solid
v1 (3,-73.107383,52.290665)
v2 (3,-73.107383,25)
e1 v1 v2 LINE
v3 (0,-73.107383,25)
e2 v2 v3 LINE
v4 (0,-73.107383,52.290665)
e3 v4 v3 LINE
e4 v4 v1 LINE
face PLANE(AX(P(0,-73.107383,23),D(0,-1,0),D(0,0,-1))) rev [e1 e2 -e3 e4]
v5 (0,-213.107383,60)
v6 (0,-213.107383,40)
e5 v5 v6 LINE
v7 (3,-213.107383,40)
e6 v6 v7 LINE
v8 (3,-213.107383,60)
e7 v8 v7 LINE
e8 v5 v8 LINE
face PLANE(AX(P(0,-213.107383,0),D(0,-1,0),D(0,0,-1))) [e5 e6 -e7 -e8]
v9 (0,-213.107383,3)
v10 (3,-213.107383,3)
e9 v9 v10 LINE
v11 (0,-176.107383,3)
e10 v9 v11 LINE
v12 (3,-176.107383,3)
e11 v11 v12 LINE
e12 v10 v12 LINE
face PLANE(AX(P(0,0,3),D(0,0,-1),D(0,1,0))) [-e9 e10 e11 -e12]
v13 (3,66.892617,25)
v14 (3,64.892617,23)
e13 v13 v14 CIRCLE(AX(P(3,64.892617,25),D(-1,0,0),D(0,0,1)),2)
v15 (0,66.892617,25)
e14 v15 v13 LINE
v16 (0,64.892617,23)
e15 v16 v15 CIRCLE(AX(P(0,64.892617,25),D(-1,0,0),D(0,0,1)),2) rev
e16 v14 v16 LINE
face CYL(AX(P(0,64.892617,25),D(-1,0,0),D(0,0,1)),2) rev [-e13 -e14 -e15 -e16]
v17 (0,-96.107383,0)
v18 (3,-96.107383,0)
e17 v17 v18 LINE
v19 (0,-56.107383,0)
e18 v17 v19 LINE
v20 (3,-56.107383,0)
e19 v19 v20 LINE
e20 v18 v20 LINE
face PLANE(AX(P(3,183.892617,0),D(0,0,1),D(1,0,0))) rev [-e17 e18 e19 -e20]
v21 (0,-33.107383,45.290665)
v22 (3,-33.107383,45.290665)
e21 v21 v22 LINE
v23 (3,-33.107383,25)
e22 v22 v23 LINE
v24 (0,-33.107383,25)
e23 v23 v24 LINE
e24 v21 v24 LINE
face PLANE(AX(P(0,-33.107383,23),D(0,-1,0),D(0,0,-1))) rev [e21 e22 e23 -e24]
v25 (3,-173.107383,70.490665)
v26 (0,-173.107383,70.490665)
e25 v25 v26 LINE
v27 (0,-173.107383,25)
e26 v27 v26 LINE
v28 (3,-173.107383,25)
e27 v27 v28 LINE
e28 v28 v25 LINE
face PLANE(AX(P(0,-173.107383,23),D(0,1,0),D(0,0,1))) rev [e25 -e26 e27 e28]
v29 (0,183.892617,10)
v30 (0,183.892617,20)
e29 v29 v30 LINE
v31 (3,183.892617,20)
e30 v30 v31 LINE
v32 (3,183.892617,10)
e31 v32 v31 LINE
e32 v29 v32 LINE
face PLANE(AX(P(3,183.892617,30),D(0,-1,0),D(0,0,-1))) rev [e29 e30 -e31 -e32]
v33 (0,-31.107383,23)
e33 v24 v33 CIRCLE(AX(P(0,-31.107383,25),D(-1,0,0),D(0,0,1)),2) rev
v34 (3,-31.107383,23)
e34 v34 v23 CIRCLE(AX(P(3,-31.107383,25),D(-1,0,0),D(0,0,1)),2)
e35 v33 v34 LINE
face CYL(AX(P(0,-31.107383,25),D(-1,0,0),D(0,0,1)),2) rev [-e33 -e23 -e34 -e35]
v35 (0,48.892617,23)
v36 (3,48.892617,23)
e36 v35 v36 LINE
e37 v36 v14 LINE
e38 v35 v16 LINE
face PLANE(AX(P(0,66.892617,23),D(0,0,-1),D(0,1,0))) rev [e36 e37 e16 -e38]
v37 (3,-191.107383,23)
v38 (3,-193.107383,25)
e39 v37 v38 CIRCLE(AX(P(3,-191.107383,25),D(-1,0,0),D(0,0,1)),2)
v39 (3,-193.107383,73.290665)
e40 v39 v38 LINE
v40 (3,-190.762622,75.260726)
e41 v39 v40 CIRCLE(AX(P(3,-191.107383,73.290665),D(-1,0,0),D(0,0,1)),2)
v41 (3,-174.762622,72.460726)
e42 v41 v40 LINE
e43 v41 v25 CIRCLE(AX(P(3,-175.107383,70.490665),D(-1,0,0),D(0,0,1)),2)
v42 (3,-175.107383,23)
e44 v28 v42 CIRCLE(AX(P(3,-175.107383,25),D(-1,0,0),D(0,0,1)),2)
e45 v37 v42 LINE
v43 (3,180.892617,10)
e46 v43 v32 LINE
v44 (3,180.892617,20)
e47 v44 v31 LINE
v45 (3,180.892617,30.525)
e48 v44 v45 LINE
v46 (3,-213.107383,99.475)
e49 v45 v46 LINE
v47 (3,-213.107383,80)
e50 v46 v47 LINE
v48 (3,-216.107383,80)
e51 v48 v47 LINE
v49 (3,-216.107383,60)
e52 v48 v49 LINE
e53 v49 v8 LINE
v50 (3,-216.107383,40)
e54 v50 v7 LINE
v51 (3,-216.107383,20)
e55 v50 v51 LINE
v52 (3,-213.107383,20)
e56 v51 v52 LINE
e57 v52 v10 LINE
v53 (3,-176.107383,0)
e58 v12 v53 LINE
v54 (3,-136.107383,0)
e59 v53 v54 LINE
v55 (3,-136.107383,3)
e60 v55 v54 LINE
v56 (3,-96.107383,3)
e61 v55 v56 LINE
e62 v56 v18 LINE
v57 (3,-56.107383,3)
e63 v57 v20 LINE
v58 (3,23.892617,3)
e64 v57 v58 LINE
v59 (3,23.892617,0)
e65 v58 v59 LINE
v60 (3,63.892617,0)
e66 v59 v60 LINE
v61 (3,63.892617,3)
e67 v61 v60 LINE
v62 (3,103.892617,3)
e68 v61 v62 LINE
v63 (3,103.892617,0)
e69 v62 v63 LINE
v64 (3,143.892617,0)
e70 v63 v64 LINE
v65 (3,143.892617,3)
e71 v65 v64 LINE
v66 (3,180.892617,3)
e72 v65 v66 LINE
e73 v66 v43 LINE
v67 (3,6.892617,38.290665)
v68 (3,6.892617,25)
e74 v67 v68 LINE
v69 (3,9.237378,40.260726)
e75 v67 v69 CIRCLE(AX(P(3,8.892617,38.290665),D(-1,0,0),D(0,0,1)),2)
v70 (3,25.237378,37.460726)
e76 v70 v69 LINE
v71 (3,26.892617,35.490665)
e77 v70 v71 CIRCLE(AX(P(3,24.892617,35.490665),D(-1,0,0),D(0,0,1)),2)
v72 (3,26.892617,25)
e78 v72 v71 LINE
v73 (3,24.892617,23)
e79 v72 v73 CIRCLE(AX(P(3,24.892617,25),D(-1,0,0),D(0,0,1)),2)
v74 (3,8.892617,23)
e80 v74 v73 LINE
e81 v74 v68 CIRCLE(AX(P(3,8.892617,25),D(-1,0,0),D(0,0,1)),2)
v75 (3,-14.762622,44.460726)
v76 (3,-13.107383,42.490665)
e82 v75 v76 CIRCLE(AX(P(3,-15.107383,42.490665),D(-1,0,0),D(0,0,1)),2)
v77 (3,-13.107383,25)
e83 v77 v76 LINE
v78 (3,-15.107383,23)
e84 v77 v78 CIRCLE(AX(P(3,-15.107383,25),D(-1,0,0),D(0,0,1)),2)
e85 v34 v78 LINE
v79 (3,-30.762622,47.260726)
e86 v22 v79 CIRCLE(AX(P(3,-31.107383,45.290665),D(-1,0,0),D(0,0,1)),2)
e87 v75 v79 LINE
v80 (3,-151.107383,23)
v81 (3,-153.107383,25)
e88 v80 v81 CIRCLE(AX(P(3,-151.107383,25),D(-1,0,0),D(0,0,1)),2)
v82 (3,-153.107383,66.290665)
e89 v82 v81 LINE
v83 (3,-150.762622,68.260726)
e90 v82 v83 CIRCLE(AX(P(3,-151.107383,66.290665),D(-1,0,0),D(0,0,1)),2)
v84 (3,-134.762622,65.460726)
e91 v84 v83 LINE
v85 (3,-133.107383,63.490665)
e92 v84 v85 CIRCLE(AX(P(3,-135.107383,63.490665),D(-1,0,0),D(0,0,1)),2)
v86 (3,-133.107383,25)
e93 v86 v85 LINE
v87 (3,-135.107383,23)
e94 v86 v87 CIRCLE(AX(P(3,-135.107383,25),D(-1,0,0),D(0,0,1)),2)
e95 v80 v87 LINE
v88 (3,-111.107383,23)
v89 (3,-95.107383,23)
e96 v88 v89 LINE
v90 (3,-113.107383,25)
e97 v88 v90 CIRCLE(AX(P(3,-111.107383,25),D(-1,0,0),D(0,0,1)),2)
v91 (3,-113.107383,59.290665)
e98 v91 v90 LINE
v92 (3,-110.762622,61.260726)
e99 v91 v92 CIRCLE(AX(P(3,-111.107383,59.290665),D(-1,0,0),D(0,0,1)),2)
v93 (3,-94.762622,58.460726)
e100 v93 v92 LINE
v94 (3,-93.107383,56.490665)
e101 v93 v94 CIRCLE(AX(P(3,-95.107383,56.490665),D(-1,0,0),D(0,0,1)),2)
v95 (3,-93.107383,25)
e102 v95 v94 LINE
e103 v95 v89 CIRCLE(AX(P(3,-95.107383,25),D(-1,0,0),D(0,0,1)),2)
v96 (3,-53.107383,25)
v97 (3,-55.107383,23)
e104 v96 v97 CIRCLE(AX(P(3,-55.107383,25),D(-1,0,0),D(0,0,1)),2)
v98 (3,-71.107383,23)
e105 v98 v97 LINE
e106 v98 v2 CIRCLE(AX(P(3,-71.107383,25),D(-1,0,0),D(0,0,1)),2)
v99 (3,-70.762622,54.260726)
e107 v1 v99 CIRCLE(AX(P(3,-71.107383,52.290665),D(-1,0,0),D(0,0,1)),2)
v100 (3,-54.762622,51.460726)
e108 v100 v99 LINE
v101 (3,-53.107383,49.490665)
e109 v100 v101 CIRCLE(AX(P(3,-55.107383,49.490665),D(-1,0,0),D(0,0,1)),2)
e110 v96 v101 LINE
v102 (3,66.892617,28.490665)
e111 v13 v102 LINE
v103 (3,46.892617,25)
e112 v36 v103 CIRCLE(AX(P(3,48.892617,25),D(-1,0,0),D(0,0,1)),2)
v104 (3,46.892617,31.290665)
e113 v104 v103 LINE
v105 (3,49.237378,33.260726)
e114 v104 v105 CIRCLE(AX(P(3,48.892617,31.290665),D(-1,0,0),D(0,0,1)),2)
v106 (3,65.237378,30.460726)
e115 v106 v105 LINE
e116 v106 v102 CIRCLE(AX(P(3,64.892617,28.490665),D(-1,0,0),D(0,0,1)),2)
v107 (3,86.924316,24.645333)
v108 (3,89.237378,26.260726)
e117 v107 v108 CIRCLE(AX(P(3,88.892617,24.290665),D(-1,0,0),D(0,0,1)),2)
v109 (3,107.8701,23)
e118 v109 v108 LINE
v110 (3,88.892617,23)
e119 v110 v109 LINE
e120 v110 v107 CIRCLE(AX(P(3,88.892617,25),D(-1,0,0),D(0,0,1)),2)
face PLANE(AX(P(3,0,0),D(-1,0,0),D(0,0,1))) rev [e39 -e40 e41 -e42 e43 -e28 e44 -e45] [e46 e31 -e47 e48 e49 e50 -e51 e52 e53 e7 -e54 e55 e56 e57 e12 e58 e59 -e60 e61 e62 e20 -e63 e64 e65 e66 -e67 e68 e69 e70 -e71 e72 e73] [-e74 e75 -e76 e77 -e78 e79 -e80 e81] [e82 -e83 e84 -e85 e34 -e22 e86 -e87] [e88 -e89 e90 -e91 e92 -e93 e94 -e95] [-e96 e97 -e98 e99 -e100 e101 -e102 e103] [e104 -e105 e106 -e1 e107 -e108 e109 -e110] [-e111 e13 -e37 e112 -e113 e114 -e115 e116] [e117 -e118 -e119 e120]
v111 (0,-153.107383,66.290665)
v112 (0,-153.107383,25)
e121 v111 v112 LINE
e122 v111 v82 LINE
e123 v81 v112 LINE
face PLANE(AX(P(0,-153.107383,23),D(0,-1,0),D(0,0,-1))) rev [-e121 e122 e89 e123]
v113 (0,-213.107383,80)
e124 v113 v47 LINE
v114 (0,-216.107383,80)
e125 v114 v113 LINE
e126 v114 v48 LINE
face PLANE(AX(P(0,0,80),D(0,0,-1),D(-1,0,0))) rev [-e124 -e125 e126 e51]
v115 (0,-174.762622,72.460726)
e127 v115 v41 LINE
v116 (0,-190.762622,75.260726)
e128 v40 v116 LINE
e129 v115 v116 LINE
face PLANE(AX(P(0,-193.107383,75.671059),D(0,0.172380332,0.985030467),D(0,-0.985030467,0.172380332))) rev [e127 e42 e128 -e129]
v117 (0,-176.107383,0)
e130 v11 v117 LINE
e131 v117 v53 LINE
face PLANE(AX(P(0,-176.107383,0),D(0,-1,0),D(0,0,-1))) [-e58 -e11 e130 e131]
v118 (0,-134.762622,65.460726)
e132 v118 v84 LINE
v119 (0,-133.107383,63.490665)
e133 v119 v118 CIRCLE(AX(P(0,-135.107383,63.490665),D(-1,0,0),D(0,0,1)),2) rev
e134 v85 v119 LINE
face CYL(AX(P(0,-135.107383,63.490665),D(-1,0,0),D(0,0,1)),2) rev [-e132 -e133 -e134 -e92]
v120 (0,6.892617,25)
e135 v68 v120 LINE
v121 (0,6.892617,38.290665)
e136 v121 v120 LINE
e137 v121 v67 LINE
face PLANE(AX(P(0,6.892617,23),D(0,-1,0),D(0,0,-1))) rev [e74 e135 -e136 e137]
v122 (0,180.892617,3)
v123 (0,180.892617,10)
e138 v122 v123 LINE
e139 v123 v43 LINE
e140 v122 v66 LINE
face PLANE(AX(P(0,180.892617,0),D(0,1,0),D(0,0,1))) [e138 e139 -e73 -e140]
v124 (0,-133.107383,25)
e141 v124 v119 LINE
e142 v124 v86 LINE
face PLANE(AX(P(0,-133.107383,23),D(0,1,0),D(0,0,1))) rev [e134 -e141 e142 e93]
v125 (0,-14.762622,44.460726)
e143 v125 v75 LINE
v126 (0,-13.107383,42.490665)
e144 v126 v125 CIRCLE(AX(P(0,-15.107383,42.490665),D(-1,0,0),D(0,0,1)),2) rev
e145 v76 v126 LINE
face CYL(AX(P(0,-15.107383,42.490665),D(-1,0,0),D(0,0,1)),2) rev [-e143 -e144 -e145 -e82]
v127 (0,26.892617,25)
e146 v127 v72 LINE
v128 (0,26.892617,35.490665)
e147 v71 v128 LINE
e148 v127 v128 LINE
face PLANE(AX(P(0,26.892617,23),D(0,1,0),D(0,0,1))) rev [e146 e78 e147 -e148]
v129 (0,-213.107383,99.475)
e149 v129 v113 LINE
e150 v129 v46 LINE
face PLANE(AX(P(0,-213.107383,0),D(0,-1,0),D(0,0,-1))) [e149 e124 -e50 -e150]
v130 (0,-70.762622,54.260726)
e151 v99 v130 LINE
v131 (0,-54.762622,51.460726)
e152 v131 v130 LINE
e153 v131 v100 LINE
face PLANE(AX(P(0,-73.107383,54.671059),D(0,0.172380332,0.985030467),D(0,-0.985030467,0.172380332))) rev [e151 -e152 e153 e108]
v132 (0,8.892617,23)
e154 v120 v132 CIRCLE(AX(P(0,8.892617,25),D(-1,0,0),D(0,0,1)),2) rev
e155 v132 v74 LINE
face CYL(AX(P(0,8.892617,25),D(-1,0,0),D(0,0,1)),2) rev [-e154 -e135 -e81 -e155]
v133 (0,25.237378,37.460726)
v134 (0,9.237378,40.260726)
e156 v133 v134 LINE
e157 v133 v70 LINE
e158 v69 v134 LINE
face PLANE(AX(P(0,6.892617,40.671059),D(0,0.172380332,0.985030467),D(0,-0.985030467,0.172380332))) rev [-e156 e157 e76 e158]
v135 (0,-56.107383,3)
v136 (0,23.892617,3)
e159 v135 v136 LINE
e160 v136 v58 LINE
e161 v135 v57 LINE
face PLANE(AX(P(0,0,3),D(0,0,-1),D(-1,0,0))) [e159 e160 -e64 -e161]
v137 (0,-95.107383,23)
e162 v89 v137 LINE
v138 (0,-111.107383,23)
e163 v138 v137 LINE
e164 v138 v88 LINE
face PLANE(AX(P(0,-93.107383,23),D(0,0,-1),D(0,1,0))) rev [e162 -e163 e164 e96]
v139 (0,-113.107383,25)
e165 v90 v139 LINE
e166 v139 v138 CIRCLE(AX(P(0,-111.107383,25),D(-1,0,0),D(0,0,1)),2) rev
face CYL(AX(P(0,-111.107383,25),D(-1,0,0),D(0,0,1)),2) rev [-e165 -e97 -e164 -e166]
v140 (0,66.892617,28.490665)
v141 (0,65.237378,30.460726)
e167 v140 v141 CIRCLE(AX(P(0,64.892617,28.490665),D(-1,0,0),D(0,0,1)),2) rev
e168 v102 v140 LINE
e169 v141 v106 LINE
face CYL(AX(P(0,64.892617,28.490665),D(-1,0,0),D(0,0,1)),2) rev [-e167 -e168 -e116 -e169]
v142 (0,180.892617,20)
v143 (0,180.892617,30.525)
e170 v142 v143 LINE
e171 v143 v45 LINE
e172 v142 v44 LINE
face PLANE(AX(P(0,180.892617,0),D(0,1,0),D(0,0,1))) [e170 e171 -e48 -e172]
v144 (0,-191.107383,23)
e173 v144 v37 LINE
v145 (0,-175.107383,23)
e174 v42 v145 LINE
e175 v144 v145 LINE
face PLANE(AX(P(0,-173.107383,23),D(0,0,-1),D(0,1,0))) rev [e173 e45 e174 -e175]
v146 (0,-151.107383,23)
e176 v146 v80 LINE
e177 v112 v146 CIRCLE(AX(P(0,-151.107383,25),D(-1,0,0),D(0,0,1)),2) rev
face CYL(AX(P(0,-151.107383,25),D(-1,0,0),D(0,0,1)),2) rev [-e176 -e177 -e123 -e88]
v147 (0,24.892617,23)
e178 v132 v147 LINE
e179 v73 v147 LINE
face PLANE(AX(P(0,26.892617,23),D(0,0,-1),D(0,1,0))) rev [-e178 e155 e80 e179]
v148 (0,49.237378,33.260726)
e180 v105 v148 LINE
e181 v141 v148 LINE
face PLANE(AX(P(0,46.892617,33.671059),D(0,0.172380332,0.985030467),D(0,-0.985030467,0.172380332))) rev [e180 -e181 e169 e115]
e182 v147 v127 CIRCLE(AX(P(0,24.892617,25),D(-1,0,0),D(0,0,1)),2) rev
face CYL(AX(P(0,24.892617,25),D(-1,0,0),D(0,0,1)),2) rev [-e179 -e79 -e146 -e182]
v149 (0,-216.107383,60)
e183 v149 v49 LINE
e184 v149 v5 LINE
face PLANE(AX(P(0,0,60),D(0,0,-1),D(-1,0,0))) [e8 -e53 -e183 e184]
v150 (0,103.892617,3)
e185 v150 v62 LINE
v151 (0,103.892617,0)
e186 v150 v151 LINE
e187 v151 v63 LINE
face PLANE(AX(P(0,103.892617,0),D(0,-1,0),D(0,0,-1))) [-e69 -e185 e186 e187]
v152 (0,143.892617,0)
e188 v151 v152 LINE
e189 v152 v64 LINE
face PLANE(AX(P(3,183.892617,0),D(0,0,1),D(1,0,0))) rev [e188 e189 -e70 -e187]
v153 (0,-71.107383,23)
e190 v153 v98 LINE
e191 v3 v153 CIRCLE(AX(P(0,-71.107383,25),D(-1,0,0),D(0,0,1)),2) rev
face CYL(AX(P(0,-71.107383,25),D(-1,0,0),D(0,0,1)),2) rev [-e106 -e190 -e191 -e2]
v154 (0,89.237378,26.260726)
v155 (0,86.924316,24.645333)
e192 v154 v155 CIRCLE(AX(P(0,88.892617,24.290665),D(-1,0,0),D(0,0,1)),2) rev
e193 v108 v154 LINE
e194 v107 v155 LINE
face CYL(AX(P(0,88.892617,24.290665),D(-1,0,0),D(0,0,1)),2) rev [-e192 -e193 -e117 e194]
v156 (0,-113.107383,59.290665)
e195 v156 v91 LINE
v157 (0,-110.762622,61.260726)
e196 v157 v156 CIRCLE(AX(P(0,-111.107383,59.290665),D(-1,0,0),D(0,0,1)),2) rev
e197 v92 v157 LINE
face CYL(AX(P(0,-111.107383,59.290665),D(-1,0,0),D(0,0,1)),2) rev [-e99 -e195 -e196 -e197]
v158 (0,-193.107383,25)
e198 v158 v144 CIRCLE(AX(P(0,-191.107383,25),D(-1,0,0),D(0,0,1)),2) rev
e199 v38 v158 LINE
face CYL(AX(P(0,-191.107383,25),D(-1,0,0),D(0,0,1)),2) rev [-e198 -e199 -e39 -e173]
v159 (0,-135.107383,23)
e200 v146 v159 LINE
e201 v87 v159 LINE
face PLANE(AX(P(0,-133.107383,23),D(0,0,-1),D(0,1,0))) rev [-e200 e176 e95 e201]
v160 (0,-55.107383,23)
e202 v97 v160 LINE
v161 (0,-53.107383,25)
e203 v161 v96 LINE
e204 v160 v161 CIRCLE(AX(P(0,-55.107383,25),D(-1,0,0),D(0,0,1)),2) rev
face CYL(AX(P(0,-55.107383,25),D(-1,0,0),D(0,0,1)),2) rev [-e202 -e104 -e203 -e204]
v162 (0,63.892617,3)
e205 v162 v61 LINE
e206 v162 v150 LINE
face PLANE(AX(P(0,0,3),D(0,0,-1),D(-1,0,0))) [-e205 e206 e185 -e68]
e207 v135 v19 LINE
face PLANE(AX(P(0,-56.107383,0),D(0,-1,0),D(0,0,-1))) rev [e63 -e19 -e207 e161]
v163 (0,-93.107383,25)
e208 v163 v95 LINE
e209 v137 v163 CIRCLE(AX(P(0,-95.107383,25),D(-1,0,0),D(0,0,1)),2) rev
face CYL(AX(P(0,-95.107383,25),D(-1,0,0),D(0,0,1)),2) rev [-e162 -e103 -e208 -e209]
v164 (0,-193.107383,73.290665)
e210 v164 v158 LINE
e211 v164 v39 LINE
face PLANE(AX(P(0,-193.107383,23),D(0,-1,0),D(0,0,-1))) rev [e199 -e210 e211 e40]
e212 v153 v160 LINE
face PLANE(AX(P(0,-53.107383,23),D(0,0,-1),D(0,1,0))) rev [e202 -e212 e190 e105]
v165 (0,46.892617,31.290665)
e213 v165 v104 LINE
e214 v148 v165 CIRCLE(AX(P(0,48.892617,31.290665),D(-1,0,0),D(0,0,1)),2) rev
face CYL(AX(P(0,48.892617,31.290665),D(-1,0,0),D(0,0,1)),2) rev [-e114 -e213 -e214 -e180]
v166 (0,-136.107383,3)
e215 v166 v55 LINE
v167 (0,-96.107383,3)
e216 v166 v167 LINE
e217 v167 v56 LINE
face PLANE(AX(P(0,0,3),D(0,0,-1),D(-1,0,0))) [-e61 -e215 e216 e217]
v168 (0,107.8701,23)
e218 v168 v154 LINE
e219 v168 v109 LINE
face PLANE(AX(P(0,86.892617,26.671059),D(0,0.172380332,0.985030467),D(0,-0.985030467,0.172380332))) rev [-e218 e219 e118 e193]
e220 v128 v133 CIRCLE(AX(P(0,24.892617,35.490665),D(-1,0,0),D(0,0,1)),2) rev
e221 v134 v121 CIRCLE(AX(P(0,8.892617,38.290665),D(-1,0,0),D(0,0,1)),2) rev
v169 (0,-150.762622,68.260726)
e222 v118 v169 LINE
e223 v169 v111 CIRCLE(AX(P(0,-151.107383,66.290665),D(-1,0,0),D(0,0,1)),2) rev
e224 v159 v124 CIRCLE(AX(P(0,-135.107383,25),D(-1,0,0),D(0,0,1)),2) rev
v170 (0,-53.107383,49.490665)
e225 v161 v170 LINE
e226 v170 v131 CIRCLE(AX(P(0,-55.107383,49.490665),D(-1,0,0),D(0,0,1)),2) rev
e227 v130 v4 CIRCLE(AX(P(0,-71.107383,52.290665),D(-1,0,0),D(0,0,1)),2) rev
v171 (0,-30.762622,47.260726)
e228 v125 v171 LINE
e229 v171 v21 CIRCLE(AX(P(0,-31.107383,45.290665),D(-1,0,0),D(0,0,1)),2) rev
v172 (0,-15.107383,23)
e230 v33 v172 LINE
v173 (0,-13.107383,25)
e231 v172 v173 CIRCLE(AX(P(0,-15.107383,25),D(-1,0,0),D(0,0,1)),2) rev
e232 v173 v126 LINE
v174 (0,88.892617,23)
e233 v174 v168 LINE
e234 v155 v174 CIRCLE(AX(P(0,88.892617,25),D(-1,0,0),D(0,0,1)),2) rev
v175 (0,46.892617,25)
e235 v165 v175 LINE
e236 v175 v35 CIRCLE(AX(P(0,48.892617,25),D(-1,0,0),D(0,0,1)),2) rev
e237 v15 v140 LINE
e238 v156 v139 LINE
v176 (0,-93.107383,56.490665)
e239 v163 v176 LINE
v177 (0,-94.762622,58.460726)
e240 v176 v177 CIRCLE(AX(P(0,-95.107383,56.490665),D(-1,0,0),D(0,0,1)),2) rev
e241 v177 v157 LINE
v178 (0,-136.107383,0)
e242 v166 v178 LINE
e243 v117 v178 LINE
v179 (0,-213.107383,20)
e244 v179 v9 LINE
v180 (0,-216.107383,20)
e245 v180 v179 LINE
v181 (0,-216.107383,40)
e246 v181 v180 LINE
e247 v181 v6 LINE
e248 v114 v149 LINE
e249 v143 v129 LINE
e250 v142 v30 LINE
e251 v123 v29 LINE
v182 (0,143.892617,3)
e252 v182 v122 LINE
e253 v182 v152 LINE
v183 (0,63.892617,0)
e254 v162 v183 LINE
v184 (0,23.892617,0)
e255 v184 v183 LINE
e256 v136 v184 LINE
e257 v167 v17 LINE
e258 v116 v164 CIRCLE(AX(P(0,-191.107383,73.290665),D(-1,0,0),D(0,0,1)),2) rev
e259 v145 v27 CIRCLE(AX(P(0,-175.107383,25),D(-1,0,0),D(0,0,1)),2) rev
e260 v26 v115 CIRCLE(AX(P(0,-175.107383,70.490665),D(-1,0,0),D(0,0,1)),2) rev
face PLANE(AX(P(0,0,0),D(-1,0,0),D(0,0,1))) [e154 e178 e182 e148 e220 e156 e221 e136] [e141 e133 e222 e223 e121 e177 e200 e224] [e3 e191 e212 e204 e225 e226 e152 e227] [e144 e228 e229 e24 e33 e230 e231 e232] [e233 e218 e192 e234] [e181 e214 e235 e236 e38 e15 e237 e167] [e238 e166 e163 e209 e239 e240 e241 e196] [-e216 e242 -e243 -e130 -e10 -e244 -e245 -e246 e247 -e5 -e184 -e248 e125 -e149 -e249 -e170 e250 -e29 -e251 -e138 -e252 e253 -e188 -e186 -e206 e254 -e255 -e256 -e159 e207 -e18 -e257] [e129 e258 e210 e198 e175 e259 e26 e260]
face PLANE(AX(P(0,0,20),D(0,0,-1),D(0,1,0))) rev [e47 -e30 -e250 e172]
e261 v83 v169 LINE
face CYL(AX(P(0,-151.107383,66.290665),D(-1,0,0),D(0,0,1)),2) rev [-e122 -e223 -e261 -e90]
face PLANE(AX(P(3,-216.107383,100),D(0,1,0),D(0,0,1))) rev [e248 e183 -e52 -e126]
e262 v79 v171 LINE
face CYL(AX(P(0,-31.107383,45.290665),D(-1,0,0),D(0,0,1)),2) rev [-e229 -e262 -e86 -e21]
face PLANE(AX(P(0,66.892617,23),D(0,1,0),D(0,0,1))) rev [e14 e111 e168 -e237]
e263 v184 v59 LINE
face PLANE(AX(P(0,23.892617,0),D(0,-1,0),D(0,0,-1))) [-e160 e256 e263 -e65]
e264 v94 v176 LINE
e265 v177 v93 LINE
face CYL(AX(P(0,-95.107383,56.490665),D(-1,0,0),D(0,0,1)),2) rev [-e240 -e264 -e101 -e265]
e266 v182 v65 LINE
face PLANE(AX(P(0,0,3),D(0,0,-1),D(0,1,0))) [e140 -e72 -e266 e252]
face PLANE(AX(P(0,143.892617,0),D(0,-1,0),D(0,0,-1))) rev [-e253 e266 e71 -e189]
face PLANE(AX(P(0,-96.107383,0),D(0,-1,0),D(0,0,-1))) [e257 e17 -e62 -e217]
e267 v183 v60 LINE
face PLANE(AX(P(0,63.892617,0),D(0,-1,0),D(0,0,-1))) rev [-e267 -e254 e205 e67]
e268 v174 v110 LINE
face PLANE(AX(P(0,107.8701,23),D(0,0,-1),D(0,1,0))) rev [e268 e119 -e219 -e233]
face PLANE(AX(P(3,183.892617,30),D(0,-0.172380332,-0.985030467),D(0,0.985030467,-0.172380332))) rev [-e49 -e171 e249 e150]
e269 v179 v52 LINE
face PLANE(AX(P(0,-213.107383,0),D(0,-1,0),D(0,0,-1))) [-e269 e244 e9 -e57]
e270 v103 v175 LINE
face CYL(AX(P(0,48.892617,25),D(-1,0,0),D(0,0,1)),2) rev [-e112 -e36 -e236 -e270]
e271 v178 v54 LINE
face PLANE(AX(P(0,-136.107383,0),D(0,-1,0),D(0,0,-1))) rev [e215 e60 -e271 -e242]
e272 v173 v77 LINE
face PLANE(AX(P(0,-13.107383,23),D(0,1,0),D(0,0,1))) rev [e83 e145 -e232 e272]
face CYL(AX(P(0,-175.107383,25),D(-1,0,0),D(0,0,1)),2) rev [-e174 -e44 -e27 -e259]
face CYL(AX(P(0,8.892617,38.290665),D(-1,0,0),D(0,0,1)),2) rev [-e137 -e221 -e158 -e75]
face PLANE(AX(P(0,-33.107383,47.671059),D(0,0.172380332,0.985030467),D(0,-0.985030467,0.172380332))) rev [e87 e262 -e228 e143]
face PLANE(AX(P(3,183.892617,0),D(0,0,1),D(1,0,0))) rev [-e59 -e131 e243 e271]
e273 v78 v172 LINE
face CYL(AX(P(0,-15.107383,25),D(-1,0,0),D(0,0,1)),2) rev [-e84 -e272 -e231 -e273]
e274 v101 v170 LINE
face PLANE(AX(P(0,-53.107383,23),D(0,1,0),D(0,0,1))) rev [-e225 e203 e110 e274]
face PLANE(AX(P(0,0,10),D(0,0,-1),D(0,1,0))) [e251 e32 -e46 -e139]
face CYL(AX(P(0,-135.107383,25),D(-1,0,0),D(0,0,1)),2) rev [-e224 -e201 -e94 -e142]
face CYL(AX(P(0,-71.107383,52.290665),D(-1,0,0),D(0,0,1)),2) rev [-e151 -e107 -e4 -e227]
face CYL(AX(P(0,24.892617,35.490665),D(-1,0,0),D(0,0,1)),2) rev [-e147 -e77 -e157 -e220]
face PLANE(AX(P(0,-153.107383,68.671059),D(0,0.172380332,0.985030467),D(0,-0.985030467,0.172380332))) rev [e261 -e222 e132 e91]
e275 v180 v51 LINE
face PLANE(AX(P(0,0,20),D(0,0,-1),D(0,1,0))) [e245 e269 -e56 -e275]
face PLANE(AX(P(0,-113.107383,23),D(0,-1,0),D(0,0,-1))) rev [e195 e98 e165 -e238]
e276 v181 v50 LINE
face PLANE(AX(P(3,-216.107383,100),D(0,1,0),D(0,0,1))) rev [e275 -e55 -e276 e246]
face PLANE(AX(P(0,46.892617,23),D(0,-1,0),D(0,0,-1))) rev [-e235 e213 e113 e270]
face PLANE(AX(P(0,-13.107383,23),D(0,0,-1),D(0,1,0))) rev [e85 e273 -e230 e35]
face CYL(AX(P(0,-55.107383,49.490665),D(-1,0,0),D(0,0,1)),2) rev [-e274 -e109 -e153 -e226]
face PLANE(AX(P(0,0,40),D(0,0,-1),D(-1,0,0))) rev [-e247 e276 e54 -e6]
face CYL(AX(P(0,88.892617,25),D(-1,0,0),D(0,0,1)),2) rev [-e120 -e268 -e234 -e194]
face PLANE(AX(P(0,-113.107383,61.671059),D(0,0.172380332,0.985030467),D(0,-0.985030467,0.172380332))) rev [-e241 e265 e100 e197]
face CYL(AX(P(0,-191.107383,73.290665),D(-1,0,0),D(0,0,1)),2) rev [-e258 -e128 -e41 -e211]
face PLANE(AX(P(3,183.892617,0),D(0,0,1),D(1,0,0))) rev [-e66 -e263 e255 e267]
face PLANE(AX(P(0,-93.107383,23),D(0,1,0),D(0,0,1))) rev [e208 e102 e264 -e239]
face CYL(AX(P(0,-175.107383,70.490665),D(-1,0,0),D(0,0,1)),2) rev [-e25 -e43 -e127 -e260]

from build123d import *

# Parameters (mm, degrees)
BOSS_EXTRUDE1_DEPTH = 3
SKETCH2_W           = 20
SKETCH2_H           = 3
SKETCH2_W_2         = 3
SKETCH2_H_2         = 40
SKETCH2_H_3         = 80
CUT_EXTRUDE1_DEPTH  = 3
CUT_EXTRUDE2_DEPTH  = 3
FILLET1_R           = 2


with BuildPart() as part:
    # Sketch1 → Boss-Extrude1 (new body)
    with BuildSketch(Plane(origin=(0, 0, 0), x_dir=(0, 0, -1), z_dir=(1, 0, 0))):
        Polygon((0, 183.89261745), (0, -216.10738255), (-100, -216.10738255), (-30, 183.89261745), align=None)
    extrude(amount=BOSS_EXTRUDE1_DEPTH)

    # Sketch2 → Cut-Extrude1 (cut)
    with BuildSketch(Plane(origin=(3, 0, 0), x_dir=(0, 0, -1), z_dir=(1, 0, 0))):
        Polygon((-80, -213.10738255), (-99.475, -213.10738255), (-100, -216.10738255), (-80, -216.10738255), align=None)
        Polygon((-30, 183.89261745), (-30.525, 180.89261745), (-20, 180.89261745), (-20, 183.89261745), align=None)
        with Locations((-50, -214.60738255)):
            Rectangle(SKETCH2_W, SKETCH2_H)
        Polygon((-3, -213.10738255), (-20, -213.10738255), (-20, -216.10738255), (0, -216.10738255), (0, -176.10738255), (-3, -176.10738255), align=None)
        Polygon((-10, 183.89261745), (-10, 180.89261745), (-3, 180.89261745), (-3, 143.89261745), (0, 143.89261745), (0, 183.89261745), align=None)
        with Locations((-1.5, -116.10738255)):
            Rectangle(SKETCH2_W_2, SKETCH2_H_2)
        with Locations((-1.5, 83.89261745)):
            Rectangle(SKETCH2_W_2, SKETCH2_H_2)
        with Locations((-1.5, -16.10738255)):
            Rectangle(SKETCH2_W_2, SKETCH2_H_3)
    extrude(amount=-CUT_EXTRUDE1_DEPTH, mode=Mode.SUBTRACT)

    # Sketch3 → Cut-Extrude2 (cut)
    with BuildSketch(Plane(origin=(3, 0, 0), x_dir=(0, 0, -1), z_dir=(1, 0, 0))):
        Polygon((-68.671059496, -153.10738255), (-65.171059496, -133.10738255), (-23, -133.10738255), (-23, -153.10738255), align=None)
        Polygon((-23, -173.10738255), (-23, -193.10738255), (-75.671059496, -193.10738255), (-72.171059496, -173.10738255), align=None)
        Polygon((-61.671059496, -113.10738255), (-58.171059496, -93.10738255), (-23, -93.10738255), (-23, -113.10738255), align=None)
        Polygon((-54.671059496, -73.10738255), (-51.171059496, -53.10738255), (-23, -53.10738255), (-23, -73.10738255), align=None)
        Polygon((-23, 107.870100283), (-23, 86.89261745), (-26.671059496, 86.89261745), align=None)
        Polygon((-23, -33.10738255), (-47.671059496, -33.10738255), (-44.171059496, -13.10738255), (-23, -13.10738255), align=None)
        Polygon((-23, 6.89261745), (-40.671059496, 6.89261745), (-37.171059496, 26.89261745), (-23, 26.89261745), align=None)
        Polygon((-23, 46.89261745), (-33.671059496, 46.89261745), (-30.171059496, 66.89261745), (-23, 66.89261745), align=None)
    extrude(amount=-CUT_EXTRUDE2_DEPTH, mode=Mode.SUBTRACT)

    # Fillet1
    # the kernel refuses this fillet: 2 mm, written as the material it adds along each edge
    with BuildSketch(Plane(origin=(3, 86.89261745, 26.671059496), x_dir=(0, 0, -1), z_dir=(-1, 0, 0)), Plane(origin=(3, 46.89261745, 33.671059496), x_dir=(0, 0, -1), z_dir=(-1, 0, 0)), Plane(origin=(3, 6.89261745, 40.671059496), x_dir=(0, 0, -1), z_dir=(-1, 0, 0)), Plane(origin=(3, -33.10738255, 47.671059496), x_dir=(0, 0, -1), z_dir=(-1, 0, 0)), Plane(origin=(3, -193.10738255, 75.671059496), x_dir=(0, 0, -1), z_dir=(-1, 0, 0))) as fillet1_piece_1:
        with BuildLine():
            CenterArc((FILLET1_R * 1.19019702521, -FILLET1_R), FILLET1_R, 90, 99.926245507)
            Line((FILLET1_R * 0.205166558057, -FILLET1_R * 1.17238033175), (0, 0))
            Line((0, 0), (FILLET1_R * 1.19019702521, 0))
        make_face()
    extrude(amount=3)
    with BuildSketch(Plane(origin=(3, 86.89261745, 23), x_dir=(0, 1, 0), z_dir=(-1, 0, 0)), Plane(origin=(3, 66.89261745, 23), x_dir=(0, 0, 1), z_dir=(-1, 0, 0)), Plane(origin=(3, 26.89261745, 23), x_dir=(0, 0, 1), z_dir=(-1, 0, 0)), Plane(origin=(3, -13.10738255, 23), x_dir=(0, 0, 1), z_dir=(-1, 0, 0)), Plane(origin=(3, -93.10738255, 23), x_dir=(0, 0, 1), z_dir=(-1, 0, 0)), Plane(origin=(3, -73.10738255, 23), x_dir=(0, 1, 0), z_dir=(-1, 0, 0)), Plane(origin=(3, -53.10738255, 23), x_dir=(0, 0, 1), z_dir=(-1, 0, 0)), Plane(origin=(3, -133.10738255, 23), x_dir=(0, 0, 1), z_dir=(-1, 0, 0)), Plane(origin=(3, -113.10738255, 23), x_dir=(0, 1, 0), z_dir=(-1, 0, 0)), Plane(origin=(3, -153.10738255, 23), x_dir=(0, 1, 0), z_dir=(-1, 0, 0)), Plane(origin=(3, -193.10738255, 23), x_dir=(0, 1, 0), z_dir=(-1, 0, 0))) as fillet1_piece_2:
        with BuildLine():
            CenterArc((FILLET1_R, -FILLET1_R), FILLET1_R, 90, 90)
            Line((0, -FILLET1_R), (0, 0))
            Line((0, 0), (FILLET1_R, 0))
        make_face()
    extrude(amount=3)
    with BuildSketch(Plane(origin=(3, 66.89261745, 30.171059496), x_dir=(0, -0.985030467155704, 0.17238033175224968), z_dir=(-1, 0, 0)), Plane(origin=(3, 26.89261745, 37.171059496), x_dir=(0, -0.9850304671557044, 0.172380331752247), z_dir=(-1, 0, 0)), Plane(origin=(3, -13.10738255, 44.171059496), x_dir=(0, -0.9850304671557039, 0.1723803317522504), z_dir=(-1, 0, 0)), Plane(origin=(3, -53.10738255, 51.171059496), x_dir=(0, -0.9850304671557039, 0.1723803317522504), z_dir=(-1, 0, 0)), Plane(origin=(3, -93.10738255, 58.171059496), x_dir=(0, -0.9850304671557047, 0.17238033175224557), z_dir=(-1, 0, 0)), Plane(origin=(3, -133.10738255, 65.171059496), x_dir=(0, -0.9850304671557039, 0.17238033175224987), z_dir=(-1, 0, 0)), Plane(origin=(3, -173.10738255, 72.171059496), x_dir=(0, -0.9850304671557039, 0.17238033175224987), z_dir=(-1, 0, 0))) as fillet1_piece_3:
        with BuildLine():
            CenterArc((FILLET1_R * 0.840197025212, -FILLET1_R), FILLET1_R, 90, 80.073754493)
            Line((-FILLET1_R * 0.144833441943, -FILLET1_R * 0.827619668248), (0, 0))
            Line((0, 0), (FILLET1_R * 0.840197025212, 0))
        make_face()
    extrude(amount=3)
    with BuildSketch(Plane(origin=(3, 46.89261745, 23), x_dir=(0, 0, 1), z_dir=(-1, 0, 0)), Plane(origin=(3, 6.89261745, 23), x_dir=(0, 0, 1), z_dir=(-1, 0, 0)), Plane(origin=(3, -33.10738255, 23), x_dir=(0, 0, 1), z_dir=(-1, 0, 0)), Plane(origin=(3, -173.10738255, 23), x_dir=(0, -1, 0), z_dir=(-1, 0, 0))) as fillet1_piece_4:
        with BuildLine():
            CenterArc((FILLET1_R, FILLET1_R), FILLET1_R, 180, 90)
            Line((0, FILLET1_R), (0, 0))
            Line((0, 0), (FILLET1_R, 0))
        make_face()
    extrude(amount=3)
    with BuildSketch(Plane(origin=(3, -73.10738255, 54.671059496), x_dir=(0, 0.985030467155704, -0.17238033175224923), z_dir=(-1, 0, 0)), Plane(origin=(3, -113.10738255, 61.671059496), x_dir=(0, 0.9850304671557042, -0.17238033175224837), z_dir=(-1, 0, 0)), Plane(origin=(3, -153.10738255, 68.671059496), x_dir=(0, 0.9850304671557039, -0.17238033175225026), z_dir=(-1, 0, 0))) as fillet1_piece_5:
        with BuildLine():
            CenterArc((FILLET1_R * 1.19019702521, FILLET1_R), FILLET1_R, 170.073754493, 99.926245507)
            Line((FILLET1_R * 0.205166558057, FILLET1_R * 1.17238033175), (0, 0))
            Line((0, 0), (FILLET1_R * 1.19019702521, 0))
        make_face()
    extrude(amount=3)


solid = part.part
